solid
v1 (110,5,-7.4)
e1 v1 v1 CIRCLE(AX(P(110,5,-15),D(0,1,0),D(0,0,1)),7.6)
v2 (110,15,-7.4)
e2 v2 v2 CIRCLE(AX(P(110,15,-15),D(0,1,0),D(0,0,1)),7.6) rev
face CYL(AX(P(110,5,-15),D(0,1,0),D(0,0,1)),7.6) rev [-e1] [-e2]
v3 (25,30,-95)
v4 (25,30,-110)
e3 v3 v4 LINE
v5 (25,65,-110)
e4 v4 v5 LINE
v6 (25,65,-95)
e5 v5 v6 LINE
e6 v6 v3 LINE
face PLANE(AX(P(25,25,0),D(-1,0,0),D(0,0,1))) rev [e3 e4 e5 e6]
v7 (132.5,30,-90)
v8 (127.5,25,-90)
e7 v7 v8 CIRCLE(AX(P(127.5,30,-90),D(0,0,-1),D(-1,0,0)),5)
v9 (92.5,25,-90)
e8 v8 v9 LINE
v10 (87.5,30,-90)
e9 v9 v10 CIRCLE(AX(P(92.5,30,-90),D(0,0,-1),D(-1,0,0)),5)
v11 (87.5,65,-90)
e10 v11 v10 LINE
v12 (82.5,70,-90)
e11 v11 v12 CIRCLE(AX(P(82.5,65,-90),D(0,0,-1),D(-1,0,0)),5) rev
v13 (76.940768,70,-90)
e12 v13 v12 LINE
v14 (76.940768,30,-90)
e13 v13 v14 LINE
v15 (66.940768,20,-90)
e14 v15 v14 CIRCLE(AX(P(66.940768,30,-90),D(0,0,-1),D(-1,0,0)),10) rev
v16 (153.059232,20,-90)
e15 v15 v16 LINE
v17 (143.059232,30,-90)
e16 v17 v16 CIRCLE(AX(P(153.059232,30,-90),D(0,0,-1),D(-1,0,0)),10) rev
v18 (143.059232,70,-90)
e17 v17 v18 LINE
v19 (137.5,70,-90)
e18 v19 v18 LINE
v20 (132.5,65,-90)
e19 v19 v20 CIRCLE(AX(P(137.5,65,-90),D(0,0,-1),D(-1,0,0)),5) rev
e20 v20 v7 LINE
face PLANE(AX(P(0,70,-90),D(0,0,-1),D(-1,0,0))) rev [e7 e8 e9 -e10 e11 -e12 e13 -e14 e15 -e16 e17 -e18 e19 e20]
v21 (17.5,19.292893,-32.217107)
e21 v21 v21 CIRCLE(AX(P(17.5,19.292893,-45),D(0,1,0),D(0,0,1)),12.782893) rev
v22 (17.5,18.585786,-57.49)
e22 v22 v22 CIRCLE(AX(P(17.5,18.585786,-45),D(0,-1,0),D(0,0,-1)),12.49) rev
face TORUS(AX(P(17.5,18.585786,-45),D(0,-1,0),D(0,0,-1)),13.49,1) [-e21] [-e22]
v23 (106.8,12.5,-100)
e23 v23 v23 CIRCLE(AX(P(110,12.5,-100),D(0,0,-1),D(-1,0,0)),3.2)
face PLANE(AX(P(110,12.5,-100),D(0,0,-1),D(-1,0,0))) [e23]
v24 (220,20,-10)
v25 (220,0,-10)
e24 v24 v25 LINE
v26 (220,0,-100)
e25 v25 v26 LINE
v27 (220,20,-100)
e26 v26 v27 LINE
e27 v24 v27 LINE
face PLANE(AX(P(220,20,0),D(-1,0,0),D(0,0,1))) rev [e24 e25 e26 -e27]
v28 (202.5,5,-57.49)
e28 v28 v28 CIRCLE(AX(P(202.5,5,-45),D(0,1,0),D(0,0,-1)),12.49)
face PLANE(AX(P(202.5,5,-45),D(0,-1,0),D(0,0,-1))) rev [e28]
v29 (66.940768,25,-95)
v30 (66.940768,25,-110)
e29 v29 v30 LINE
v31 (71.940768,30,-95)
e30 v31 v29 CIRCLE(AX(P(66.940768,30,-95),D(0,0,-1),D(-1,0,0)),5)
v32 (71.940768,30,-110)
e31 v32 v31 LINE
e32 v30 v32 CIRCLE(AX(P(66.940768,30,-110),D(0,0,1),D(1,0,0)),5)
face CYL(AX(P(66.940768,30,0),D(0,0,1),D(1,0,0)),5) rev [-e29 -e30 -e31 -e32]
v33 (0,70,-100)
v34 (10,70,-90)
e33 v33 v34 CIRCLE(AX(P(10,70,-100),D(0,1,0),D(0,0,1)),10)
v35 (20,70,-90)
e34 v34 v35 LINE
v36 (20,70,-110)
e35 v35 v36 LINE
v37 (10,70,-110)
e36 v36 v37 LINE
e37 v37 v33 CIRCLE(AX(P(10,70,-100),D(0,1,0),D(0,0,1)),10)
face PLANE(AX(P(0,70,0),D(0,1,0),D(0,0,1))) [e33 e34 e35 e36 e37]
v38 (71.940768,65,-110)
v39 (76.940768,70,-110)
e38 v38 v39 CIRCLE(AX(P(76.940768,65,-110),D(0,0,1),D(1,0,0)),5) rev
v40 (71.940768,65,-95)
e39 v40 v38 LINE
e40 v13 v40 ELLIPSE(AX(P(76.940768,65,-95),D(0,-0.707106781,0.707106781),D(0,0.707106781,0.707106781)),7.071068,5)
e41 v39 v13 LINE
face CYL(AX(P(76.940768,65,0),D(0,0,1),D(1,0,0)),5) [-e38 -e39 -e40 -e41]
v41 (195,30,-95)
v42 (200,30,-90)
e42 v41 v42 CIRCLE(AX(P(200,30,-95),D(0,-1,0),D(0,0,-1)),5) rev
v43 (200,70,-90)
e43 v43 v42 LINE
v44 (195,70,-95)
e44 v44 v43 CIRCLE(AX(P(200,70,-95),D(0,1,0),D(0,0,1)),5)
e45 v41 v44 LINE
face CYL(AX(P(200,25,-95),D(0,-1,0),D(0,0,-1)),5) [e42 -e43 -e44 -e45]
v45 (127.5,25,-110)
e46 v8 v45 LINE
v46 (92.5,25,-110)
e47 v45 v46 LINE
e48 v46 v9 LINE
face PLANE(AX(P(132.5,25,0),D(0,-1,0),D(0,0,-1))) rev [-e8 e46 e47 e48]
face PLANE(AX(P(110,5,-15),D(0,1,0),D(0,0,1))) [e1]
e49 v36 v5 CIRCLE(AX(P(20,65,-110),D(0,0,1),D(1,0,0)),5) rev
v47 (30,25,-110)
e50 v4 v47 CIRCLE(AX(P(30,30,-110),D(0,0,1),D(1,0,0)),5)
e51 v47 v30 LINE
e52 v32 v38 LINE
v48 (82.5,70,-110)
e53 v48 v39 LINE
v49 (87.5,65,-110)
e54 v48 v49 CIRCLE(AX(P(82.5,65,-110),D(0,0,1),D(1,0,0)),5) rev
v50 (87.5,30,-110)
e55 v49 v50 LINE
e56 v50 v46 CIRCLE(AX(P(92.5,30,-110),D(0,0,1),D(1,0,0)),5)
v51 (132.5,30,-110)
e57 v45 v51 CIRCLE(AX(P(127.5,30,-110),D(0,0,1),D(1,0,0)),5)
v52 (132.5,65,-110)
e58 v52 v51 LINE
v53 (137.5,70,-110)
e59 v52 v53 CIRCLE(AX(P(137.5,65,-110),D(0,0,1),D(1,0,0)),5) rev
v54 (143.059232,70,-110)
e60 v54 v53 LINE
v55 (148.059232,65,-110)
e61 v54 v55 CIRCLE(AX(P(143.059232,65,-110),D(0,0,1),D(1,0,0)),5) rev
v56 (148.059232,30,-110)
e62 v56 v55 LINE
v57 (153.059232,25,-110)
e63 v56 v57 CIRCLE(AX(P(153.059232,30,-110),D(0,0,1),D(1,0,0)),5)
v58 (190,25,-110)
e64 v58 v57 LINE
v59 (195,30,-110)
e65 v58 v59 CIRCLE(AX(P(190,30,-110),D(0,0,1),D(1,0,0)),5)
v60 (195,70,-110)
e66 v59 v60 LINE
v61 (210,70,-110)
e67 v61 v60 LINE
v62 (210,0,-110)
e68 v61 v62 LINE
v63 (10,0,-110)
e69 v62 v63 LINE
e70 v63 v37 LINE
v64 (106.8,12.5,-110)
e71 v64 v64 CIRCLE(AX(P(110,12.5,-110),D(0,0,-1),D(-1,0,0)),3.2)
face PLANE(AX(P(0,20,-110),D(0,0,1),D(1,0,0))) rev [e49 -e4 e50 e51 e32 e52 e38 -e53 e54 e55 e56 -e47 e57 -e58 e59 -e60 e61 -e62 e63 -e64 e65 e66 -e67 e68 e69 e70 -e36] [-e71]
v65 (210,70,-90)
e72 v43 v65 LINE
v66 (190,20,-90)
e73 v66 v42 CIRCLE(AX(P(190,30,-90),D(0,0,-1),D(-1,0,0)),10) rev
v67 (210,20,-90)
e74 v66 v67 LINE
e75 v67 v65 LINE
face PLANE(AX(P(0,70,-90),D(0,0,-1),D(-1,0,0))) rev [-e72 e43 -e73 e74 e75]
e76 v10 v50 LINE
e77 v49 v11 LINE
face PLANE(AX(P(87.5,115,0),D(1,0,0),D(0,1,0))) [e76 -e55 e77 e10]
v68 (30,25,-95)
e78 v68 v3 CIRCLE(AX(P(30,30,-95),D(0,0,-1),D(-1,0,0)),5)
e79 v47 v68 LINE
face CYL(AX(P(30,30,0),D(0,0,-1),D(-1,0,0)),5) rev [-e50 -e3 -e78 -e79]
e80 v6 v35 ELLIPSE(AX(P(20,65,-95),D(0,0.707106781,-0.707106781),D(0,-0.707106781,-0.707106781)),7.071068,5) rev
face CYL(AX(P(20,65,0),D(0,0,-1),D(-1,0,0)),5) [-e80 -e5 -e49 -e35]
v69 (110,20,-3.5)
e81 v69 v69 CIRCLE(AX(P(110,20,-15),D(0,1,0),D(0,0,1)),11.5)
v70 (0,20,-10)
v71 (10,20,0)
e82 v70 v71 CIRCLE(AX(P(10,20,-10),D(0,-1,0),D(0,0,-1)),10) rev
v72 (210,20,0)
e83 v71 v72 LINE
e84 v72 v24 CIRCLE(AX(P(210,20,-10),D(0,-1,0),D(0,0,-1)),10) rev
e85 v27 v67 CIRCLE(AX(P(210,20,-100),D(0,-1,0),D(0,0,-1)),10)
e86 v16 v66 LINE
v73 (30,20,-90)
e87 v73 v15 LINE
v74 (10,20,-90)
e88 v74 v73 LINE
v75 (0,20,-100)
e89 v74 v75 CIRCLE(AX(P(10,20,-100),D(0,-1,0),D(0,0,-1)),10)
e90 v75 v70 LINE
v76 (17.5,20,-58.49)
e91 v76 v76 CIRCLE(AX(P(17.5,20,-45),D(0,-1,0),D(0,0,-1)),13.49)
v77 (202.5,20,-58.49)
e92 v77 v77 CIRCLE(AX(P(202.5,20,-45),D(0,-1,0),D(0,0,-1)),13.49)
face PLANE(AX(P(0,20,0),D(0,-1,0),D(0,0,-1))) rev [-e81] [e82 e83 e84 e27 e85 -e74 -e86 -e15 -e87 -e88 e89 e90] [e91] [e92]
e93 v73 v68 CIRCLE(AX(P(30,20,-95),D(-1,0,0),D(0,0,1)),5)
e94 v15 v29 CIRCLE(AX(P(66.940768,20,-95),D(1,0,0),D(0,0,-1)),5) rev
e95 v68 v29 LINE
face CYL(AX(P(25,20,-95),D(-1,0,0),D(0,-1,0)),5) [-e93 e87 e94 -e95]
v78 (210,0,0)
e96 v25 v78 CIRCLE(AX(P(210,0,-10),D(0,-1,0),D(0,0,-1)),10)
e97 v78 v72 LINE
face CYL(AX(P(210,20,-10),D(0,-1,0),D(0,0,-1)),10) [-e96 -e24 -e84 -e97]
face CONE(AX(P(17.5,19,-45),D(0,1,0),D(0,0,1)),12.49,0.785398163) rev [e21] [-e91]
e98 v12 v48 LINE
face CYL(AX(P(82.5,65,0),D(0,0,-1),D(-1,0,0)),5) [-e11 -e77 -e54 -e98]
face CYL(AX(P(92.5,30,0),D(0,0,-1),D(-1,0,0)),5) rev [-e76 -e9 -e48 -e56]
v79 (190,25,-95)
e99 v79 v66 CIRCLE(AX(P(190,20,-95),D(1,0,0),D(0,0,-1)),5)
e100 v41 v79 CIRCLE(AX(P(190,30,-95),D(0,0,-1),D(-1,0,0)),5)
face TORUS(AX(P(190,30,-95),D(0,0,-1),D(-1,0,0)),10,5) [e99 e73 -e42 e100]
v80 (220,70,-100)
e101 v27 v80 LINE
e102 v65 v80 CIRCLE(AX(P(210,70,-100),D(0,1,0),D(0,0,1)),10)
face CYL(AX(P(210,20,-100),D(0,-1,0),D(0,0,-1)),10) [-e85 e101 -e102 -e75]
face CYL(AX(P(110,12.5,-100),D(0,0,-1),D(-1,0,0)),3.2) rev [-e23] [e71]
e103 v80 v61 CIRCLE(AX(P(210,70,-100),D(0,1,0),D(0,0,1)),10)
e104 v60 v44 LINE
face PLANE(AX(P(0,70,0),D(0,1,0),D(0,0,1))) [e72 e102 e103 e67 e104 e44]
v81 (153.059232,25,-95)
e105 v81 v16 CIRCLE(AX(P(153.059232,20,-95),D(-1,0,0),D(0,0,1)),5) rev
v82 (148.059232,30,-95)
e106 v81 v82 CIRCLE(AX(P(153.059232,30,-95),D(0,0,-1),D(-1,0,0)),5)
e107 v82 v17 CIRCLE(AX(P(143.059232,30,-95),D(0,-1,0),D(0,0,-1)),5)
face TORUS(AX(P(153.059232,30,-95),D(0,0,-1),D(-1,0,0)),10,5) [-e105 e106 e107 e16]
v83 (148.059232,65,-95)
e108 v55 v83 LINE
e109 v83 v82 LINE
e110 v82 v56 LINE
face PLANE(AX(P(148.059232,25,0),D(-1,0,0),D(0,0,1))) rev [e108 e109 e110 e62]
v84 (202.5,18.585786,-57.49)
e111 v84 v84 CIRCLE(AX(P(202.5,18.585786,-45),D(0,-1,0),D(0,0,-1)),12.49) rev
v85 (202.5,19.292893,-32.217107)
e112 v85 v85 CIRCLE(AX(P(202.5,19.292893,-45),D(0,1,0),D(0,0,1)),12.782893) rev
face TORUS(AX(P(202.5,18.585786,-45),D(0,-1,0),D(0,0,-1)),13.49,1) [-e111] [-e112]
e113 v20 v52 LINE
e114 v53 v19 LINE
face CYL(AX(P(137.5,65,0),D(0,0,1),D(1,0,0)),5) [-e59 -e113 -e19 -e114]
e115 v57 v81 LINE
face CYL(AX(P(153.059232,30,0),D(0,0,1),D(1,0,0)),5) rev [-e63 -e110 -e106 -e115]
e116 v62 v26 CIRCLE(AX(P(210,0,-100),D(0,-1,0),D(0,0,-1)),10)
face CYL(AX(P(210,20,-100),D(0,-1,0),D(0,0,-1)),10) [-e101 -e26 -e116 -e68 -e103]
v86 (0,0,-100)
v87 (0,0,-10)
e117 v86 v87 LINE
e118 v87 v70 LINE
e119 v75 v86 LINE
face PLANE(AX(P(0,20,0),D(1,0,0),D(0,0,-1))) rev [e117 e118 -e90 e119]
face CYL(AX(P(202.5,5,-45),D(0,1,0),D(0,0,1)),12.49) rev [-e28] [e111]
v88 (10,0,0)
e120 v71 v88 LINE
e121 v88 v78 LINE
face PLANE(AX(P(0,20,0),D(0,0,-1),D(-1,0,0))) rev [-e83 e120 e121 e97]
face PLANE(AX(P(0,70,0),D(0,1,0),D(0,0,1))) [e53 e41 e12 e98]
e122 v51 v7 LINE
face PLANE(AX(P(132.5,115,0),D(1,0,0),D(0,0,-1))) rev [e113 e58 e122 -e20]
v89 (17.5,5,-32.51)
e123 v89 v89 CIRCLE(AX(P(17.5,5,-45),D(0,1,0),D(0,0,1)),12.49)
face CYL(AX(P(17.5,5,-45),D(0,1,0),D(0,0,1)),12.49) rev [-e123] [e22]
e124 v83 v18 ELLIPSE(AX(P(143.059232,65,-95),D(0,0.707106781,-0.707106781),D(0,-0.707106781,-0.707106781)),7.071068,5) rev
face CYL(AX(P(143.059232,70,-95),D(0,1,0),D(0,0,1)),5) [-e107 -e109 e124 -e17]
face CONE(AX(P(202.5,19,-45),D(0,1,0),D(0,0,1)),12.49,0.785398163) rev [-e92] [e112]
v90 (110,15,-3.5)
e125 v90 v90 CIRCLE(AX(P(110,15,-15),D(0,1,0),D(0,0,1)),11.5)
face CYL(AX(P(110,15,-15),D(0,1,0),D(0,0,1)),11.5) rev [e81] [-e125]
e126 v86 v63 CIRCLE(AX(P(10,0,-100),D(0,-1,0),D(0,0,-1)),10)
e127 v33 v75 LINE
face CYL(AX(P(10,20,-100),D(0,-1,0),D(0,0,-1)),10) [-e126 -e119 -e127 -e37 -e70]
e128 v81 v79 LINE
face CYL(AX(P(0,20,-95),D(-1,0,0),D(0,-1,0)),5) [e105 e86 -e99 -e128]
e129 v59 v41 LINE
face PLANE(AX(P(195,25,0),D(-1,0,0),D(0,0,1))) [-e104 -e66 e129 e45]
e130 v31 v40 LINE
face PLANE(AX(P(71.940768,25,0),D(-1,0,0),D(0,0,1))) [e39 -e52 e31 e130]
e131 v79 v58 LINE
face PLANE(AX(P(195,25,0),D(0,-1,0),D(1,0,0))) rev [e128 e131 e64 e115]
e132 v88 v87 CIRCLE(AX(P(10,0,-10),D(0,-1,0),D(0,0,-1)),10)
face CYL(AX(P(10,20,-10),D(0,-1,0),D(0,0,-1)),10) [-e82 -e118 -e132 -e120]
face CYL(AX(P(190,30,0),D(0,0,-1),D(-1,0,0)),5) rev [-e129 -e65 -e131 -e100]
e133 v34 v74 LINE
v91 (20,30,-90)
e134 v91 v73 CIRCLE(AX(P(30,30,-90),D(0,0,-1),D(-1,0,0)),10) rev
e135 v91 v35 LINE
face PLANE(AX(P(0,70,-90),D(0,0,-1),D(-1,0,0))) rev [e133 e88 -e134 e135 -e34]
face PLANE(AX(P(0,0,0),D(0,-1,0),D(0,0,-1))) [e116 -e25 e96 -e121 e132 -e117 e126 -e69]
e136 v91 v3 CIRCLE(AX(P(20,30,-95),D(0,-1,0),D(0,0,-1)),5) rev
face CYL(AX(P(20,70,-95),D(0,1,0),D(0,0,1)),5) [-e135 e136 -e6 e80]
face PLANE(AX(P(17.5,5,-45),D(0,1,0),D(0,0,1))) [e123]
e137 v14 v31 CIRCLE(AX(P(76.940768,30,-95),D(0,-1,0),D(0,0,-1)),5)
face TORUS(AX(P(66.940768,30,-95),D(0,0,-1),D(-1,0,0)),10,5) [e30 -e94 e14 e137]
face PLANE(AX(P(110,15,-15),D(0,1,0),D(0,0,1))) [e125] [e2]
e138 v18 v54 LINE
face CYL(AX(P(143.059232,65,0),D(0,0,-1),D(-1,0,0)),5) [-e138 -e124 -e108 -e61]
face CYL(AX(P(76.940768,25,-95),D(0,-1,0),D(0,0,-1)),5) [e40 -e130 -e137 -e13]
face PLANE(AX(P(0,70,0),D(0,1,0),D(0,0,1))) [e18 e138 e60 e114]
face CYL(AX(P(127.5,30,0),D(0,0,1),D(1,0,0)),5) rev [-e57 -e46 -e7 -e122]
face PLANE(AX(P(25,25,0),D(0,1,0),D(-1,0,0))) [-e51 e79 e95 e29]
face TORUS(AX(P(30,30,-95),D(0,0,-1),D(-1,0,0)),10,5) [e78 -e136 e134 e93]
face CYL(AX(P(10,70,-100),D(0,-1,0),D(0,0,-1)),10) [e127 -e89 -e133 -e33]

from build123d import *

# Parameters (mm, degrees)
SKETCH1_W           = 220
SKETCH1_H           = 110
BOSS_EXTRUDE1_DEPTH = 20
SKETCH2_R           = 12.49
SKETCH2_R_2         = 7.6
CUT_EXTRUDE1_DEPTH  = 15
SKETCH3_W           = 220
SKETCH3_H           = 20
BOSS_EXTRUDE2_DEPTH = 50
CHAMFER1_SIZE       = 1
FILLET1_R           = 1
FILLET2_R           = 10
SKETCH4_R           = 11.5
CUT_EXTRUDE2_DEPTH  = 5
SKETCH5_W           = 46.94076836
SKETCH5_H           = 60
SKETCH5_W_2         = 45
SKETCH5_H_2         = 90
CUT_EXTRUDE3_DEPTH  = 256.734237051
FILLET4_R           = 5
SKETCH6_R           = 3.2
CUT_EXTRUDE4_DEPTH  = 10


with BuildPart() as part:
    # Sketch1 → Boss-Extrude1 (new body)
    with BuildSketch(Plane(origin=(0, 0, 0), x_dir=(1, 0, 0), z_dir=(0, 1, 0))):
        with Locations((110, 55)):
            Rectangle(SKETCH1_W, SKETCH1_H)
    extrude(amount=BOSS_EXTRUDE1_DEPTH)

    # Sketch2 → Cut-Extrude1 (cut)
    with BuildSketch(Plane(origin=(0, 20, 0), x_dir=(1, 0, 0), z_dir=(0, 1, 0))):
        with Locations(Location((17.5, 45, 0), (0, 0, 270))):
            Circle(SKETCH2_R)
        with Locations(Location((202.5, 45, 0), (0, 0, 90))):
            Circle(SKETCH2_R)
        with Locations(Location((110, 15, 0), (0, 0, 270))):
            Circle(SKETCH2_R_2)
    extrude(amount=-CUT_EXTRUDE1_DEPTH, mode=Mode.SUBTRACT)

    # Sketch3 → Boss-Extrude2 (add)
    with BuildSketch(Plane(origin=(0, 20, 0), x_dir=(1, 0, 0), z_dir=(0, 1, 0))):
        with Locations((110, 100)):
            Rectangle(SKETCH3_W, SKETCH3_H)
    extrude(amount=BOSS_EXTRUDE2_DEPTH)

    # Chamfer1
    chamfer1_edges = [part.edges().sort_by_distance(p)[0] for p in [
        (17.5, 20, -57.49),
        (202.5, 20, -32.51),
    ]]
    chamfer(chamfer1_edges, length=CHAMFER1_SIZE)

    # Fillet1
    fillet1_edges = [part.edges().sort_by_distance(p)[0] for p in [
        (202.5, 19, -32.51),
        (17.5, 19, -57.49),
    ]]
    fillet(fillet1_edges, radius=FILLET1_R)

    # Fillet2
    fillet2_edges = [part.edges().sort_by_distance(p)[0] for p in [
        (220, 45, -90),
        (0, 45, -90),
        (0, 35, -110),
        (0, 10, 0),
        (220, 35, -110),
        (220, 10, 0),
    ]]
    fillet(fillet2_edges, radius=FILLET2_R - 0.0001)  # a hair under: the kernel refuses the full size

    # Sketch4 → Cut-Extrude2 (cut)
    with BuildSketch(Plane(origin=(0, 20, 0), x_dir=(1, 0, 0), z_dir=(0, 1, 0))):
        with Locations(Location((110, 15, 0), (0, 0, 270))):
            Circle(SKETCH4_R)
    extrude(amount=-CUT_EXTRUDE2_DEPTH, mode=Mode.SUBTRACT)

    # Sketch5 → Cut-Extrude3 (cut, through all)
    with BuildSketch(Plane(origin=(0, 0, -110), x_dir=(-1, 0, 0), z_dir=(0, 0, -1))):
        with Locations((-171.52961582, 55)):
            Rectangle(SKETCH5_W, SKETCH5_H)
        with Locations((-48.47038418, 55)):
            Rectangle(SKETCH5_W, SKETCH5_H)
        with Locations((-110, 70)):
            Rectangle(SKETCH5_W_2, SKETCH5_H_2)
    extrude(amount=-CUT_EXTRUDE3_DEPTH, mode=Mode.SUBTRACT)

    # Fillet4
    fillet4_edges = [part.edges().sort_by_distance(p)[0] for p in [
        (195, 47.5, -90),
        (148.05923164, 47.5, -90),
        (25, 47.5, -90),
        (71.94076836, 47.5, -90),
        (171.52961582, 25, -90),
        (48.47038418, 25, -90),
        (25, 70, -100),
        (25, 25, -100),
        (71.94076836, 25, -100),
        (71.94076836, 70, -100),
        (87.5, 70, -100),
        (87.5, 25, -100),
        (132.5, 25, -100),
        (132.5, 70, -100),
        (148.05923164, 70, -100),
        (148.05923164, 25, -100),
        (195, 25, -100),
    ]]
    fillet(fillet4_edges, radius=FILLET4_R - 0.0001)  # a hair under: the kernel refuses the full size

    # Sketch6 → Cut-Extrude4 (cut)
    with BuildSketch(Plane(origin=(0, 0, -110), x_dir=(-1, 0, 0), z_dir=(0, 0, -1))):
        with Locations((-110, 12.5)):
            Circle(SKETCH6_R)
    extrude(amount=-CUT_EXTRUDE4_DEPTH, mode=Mode.SUBTRACT)


solid = part.part
